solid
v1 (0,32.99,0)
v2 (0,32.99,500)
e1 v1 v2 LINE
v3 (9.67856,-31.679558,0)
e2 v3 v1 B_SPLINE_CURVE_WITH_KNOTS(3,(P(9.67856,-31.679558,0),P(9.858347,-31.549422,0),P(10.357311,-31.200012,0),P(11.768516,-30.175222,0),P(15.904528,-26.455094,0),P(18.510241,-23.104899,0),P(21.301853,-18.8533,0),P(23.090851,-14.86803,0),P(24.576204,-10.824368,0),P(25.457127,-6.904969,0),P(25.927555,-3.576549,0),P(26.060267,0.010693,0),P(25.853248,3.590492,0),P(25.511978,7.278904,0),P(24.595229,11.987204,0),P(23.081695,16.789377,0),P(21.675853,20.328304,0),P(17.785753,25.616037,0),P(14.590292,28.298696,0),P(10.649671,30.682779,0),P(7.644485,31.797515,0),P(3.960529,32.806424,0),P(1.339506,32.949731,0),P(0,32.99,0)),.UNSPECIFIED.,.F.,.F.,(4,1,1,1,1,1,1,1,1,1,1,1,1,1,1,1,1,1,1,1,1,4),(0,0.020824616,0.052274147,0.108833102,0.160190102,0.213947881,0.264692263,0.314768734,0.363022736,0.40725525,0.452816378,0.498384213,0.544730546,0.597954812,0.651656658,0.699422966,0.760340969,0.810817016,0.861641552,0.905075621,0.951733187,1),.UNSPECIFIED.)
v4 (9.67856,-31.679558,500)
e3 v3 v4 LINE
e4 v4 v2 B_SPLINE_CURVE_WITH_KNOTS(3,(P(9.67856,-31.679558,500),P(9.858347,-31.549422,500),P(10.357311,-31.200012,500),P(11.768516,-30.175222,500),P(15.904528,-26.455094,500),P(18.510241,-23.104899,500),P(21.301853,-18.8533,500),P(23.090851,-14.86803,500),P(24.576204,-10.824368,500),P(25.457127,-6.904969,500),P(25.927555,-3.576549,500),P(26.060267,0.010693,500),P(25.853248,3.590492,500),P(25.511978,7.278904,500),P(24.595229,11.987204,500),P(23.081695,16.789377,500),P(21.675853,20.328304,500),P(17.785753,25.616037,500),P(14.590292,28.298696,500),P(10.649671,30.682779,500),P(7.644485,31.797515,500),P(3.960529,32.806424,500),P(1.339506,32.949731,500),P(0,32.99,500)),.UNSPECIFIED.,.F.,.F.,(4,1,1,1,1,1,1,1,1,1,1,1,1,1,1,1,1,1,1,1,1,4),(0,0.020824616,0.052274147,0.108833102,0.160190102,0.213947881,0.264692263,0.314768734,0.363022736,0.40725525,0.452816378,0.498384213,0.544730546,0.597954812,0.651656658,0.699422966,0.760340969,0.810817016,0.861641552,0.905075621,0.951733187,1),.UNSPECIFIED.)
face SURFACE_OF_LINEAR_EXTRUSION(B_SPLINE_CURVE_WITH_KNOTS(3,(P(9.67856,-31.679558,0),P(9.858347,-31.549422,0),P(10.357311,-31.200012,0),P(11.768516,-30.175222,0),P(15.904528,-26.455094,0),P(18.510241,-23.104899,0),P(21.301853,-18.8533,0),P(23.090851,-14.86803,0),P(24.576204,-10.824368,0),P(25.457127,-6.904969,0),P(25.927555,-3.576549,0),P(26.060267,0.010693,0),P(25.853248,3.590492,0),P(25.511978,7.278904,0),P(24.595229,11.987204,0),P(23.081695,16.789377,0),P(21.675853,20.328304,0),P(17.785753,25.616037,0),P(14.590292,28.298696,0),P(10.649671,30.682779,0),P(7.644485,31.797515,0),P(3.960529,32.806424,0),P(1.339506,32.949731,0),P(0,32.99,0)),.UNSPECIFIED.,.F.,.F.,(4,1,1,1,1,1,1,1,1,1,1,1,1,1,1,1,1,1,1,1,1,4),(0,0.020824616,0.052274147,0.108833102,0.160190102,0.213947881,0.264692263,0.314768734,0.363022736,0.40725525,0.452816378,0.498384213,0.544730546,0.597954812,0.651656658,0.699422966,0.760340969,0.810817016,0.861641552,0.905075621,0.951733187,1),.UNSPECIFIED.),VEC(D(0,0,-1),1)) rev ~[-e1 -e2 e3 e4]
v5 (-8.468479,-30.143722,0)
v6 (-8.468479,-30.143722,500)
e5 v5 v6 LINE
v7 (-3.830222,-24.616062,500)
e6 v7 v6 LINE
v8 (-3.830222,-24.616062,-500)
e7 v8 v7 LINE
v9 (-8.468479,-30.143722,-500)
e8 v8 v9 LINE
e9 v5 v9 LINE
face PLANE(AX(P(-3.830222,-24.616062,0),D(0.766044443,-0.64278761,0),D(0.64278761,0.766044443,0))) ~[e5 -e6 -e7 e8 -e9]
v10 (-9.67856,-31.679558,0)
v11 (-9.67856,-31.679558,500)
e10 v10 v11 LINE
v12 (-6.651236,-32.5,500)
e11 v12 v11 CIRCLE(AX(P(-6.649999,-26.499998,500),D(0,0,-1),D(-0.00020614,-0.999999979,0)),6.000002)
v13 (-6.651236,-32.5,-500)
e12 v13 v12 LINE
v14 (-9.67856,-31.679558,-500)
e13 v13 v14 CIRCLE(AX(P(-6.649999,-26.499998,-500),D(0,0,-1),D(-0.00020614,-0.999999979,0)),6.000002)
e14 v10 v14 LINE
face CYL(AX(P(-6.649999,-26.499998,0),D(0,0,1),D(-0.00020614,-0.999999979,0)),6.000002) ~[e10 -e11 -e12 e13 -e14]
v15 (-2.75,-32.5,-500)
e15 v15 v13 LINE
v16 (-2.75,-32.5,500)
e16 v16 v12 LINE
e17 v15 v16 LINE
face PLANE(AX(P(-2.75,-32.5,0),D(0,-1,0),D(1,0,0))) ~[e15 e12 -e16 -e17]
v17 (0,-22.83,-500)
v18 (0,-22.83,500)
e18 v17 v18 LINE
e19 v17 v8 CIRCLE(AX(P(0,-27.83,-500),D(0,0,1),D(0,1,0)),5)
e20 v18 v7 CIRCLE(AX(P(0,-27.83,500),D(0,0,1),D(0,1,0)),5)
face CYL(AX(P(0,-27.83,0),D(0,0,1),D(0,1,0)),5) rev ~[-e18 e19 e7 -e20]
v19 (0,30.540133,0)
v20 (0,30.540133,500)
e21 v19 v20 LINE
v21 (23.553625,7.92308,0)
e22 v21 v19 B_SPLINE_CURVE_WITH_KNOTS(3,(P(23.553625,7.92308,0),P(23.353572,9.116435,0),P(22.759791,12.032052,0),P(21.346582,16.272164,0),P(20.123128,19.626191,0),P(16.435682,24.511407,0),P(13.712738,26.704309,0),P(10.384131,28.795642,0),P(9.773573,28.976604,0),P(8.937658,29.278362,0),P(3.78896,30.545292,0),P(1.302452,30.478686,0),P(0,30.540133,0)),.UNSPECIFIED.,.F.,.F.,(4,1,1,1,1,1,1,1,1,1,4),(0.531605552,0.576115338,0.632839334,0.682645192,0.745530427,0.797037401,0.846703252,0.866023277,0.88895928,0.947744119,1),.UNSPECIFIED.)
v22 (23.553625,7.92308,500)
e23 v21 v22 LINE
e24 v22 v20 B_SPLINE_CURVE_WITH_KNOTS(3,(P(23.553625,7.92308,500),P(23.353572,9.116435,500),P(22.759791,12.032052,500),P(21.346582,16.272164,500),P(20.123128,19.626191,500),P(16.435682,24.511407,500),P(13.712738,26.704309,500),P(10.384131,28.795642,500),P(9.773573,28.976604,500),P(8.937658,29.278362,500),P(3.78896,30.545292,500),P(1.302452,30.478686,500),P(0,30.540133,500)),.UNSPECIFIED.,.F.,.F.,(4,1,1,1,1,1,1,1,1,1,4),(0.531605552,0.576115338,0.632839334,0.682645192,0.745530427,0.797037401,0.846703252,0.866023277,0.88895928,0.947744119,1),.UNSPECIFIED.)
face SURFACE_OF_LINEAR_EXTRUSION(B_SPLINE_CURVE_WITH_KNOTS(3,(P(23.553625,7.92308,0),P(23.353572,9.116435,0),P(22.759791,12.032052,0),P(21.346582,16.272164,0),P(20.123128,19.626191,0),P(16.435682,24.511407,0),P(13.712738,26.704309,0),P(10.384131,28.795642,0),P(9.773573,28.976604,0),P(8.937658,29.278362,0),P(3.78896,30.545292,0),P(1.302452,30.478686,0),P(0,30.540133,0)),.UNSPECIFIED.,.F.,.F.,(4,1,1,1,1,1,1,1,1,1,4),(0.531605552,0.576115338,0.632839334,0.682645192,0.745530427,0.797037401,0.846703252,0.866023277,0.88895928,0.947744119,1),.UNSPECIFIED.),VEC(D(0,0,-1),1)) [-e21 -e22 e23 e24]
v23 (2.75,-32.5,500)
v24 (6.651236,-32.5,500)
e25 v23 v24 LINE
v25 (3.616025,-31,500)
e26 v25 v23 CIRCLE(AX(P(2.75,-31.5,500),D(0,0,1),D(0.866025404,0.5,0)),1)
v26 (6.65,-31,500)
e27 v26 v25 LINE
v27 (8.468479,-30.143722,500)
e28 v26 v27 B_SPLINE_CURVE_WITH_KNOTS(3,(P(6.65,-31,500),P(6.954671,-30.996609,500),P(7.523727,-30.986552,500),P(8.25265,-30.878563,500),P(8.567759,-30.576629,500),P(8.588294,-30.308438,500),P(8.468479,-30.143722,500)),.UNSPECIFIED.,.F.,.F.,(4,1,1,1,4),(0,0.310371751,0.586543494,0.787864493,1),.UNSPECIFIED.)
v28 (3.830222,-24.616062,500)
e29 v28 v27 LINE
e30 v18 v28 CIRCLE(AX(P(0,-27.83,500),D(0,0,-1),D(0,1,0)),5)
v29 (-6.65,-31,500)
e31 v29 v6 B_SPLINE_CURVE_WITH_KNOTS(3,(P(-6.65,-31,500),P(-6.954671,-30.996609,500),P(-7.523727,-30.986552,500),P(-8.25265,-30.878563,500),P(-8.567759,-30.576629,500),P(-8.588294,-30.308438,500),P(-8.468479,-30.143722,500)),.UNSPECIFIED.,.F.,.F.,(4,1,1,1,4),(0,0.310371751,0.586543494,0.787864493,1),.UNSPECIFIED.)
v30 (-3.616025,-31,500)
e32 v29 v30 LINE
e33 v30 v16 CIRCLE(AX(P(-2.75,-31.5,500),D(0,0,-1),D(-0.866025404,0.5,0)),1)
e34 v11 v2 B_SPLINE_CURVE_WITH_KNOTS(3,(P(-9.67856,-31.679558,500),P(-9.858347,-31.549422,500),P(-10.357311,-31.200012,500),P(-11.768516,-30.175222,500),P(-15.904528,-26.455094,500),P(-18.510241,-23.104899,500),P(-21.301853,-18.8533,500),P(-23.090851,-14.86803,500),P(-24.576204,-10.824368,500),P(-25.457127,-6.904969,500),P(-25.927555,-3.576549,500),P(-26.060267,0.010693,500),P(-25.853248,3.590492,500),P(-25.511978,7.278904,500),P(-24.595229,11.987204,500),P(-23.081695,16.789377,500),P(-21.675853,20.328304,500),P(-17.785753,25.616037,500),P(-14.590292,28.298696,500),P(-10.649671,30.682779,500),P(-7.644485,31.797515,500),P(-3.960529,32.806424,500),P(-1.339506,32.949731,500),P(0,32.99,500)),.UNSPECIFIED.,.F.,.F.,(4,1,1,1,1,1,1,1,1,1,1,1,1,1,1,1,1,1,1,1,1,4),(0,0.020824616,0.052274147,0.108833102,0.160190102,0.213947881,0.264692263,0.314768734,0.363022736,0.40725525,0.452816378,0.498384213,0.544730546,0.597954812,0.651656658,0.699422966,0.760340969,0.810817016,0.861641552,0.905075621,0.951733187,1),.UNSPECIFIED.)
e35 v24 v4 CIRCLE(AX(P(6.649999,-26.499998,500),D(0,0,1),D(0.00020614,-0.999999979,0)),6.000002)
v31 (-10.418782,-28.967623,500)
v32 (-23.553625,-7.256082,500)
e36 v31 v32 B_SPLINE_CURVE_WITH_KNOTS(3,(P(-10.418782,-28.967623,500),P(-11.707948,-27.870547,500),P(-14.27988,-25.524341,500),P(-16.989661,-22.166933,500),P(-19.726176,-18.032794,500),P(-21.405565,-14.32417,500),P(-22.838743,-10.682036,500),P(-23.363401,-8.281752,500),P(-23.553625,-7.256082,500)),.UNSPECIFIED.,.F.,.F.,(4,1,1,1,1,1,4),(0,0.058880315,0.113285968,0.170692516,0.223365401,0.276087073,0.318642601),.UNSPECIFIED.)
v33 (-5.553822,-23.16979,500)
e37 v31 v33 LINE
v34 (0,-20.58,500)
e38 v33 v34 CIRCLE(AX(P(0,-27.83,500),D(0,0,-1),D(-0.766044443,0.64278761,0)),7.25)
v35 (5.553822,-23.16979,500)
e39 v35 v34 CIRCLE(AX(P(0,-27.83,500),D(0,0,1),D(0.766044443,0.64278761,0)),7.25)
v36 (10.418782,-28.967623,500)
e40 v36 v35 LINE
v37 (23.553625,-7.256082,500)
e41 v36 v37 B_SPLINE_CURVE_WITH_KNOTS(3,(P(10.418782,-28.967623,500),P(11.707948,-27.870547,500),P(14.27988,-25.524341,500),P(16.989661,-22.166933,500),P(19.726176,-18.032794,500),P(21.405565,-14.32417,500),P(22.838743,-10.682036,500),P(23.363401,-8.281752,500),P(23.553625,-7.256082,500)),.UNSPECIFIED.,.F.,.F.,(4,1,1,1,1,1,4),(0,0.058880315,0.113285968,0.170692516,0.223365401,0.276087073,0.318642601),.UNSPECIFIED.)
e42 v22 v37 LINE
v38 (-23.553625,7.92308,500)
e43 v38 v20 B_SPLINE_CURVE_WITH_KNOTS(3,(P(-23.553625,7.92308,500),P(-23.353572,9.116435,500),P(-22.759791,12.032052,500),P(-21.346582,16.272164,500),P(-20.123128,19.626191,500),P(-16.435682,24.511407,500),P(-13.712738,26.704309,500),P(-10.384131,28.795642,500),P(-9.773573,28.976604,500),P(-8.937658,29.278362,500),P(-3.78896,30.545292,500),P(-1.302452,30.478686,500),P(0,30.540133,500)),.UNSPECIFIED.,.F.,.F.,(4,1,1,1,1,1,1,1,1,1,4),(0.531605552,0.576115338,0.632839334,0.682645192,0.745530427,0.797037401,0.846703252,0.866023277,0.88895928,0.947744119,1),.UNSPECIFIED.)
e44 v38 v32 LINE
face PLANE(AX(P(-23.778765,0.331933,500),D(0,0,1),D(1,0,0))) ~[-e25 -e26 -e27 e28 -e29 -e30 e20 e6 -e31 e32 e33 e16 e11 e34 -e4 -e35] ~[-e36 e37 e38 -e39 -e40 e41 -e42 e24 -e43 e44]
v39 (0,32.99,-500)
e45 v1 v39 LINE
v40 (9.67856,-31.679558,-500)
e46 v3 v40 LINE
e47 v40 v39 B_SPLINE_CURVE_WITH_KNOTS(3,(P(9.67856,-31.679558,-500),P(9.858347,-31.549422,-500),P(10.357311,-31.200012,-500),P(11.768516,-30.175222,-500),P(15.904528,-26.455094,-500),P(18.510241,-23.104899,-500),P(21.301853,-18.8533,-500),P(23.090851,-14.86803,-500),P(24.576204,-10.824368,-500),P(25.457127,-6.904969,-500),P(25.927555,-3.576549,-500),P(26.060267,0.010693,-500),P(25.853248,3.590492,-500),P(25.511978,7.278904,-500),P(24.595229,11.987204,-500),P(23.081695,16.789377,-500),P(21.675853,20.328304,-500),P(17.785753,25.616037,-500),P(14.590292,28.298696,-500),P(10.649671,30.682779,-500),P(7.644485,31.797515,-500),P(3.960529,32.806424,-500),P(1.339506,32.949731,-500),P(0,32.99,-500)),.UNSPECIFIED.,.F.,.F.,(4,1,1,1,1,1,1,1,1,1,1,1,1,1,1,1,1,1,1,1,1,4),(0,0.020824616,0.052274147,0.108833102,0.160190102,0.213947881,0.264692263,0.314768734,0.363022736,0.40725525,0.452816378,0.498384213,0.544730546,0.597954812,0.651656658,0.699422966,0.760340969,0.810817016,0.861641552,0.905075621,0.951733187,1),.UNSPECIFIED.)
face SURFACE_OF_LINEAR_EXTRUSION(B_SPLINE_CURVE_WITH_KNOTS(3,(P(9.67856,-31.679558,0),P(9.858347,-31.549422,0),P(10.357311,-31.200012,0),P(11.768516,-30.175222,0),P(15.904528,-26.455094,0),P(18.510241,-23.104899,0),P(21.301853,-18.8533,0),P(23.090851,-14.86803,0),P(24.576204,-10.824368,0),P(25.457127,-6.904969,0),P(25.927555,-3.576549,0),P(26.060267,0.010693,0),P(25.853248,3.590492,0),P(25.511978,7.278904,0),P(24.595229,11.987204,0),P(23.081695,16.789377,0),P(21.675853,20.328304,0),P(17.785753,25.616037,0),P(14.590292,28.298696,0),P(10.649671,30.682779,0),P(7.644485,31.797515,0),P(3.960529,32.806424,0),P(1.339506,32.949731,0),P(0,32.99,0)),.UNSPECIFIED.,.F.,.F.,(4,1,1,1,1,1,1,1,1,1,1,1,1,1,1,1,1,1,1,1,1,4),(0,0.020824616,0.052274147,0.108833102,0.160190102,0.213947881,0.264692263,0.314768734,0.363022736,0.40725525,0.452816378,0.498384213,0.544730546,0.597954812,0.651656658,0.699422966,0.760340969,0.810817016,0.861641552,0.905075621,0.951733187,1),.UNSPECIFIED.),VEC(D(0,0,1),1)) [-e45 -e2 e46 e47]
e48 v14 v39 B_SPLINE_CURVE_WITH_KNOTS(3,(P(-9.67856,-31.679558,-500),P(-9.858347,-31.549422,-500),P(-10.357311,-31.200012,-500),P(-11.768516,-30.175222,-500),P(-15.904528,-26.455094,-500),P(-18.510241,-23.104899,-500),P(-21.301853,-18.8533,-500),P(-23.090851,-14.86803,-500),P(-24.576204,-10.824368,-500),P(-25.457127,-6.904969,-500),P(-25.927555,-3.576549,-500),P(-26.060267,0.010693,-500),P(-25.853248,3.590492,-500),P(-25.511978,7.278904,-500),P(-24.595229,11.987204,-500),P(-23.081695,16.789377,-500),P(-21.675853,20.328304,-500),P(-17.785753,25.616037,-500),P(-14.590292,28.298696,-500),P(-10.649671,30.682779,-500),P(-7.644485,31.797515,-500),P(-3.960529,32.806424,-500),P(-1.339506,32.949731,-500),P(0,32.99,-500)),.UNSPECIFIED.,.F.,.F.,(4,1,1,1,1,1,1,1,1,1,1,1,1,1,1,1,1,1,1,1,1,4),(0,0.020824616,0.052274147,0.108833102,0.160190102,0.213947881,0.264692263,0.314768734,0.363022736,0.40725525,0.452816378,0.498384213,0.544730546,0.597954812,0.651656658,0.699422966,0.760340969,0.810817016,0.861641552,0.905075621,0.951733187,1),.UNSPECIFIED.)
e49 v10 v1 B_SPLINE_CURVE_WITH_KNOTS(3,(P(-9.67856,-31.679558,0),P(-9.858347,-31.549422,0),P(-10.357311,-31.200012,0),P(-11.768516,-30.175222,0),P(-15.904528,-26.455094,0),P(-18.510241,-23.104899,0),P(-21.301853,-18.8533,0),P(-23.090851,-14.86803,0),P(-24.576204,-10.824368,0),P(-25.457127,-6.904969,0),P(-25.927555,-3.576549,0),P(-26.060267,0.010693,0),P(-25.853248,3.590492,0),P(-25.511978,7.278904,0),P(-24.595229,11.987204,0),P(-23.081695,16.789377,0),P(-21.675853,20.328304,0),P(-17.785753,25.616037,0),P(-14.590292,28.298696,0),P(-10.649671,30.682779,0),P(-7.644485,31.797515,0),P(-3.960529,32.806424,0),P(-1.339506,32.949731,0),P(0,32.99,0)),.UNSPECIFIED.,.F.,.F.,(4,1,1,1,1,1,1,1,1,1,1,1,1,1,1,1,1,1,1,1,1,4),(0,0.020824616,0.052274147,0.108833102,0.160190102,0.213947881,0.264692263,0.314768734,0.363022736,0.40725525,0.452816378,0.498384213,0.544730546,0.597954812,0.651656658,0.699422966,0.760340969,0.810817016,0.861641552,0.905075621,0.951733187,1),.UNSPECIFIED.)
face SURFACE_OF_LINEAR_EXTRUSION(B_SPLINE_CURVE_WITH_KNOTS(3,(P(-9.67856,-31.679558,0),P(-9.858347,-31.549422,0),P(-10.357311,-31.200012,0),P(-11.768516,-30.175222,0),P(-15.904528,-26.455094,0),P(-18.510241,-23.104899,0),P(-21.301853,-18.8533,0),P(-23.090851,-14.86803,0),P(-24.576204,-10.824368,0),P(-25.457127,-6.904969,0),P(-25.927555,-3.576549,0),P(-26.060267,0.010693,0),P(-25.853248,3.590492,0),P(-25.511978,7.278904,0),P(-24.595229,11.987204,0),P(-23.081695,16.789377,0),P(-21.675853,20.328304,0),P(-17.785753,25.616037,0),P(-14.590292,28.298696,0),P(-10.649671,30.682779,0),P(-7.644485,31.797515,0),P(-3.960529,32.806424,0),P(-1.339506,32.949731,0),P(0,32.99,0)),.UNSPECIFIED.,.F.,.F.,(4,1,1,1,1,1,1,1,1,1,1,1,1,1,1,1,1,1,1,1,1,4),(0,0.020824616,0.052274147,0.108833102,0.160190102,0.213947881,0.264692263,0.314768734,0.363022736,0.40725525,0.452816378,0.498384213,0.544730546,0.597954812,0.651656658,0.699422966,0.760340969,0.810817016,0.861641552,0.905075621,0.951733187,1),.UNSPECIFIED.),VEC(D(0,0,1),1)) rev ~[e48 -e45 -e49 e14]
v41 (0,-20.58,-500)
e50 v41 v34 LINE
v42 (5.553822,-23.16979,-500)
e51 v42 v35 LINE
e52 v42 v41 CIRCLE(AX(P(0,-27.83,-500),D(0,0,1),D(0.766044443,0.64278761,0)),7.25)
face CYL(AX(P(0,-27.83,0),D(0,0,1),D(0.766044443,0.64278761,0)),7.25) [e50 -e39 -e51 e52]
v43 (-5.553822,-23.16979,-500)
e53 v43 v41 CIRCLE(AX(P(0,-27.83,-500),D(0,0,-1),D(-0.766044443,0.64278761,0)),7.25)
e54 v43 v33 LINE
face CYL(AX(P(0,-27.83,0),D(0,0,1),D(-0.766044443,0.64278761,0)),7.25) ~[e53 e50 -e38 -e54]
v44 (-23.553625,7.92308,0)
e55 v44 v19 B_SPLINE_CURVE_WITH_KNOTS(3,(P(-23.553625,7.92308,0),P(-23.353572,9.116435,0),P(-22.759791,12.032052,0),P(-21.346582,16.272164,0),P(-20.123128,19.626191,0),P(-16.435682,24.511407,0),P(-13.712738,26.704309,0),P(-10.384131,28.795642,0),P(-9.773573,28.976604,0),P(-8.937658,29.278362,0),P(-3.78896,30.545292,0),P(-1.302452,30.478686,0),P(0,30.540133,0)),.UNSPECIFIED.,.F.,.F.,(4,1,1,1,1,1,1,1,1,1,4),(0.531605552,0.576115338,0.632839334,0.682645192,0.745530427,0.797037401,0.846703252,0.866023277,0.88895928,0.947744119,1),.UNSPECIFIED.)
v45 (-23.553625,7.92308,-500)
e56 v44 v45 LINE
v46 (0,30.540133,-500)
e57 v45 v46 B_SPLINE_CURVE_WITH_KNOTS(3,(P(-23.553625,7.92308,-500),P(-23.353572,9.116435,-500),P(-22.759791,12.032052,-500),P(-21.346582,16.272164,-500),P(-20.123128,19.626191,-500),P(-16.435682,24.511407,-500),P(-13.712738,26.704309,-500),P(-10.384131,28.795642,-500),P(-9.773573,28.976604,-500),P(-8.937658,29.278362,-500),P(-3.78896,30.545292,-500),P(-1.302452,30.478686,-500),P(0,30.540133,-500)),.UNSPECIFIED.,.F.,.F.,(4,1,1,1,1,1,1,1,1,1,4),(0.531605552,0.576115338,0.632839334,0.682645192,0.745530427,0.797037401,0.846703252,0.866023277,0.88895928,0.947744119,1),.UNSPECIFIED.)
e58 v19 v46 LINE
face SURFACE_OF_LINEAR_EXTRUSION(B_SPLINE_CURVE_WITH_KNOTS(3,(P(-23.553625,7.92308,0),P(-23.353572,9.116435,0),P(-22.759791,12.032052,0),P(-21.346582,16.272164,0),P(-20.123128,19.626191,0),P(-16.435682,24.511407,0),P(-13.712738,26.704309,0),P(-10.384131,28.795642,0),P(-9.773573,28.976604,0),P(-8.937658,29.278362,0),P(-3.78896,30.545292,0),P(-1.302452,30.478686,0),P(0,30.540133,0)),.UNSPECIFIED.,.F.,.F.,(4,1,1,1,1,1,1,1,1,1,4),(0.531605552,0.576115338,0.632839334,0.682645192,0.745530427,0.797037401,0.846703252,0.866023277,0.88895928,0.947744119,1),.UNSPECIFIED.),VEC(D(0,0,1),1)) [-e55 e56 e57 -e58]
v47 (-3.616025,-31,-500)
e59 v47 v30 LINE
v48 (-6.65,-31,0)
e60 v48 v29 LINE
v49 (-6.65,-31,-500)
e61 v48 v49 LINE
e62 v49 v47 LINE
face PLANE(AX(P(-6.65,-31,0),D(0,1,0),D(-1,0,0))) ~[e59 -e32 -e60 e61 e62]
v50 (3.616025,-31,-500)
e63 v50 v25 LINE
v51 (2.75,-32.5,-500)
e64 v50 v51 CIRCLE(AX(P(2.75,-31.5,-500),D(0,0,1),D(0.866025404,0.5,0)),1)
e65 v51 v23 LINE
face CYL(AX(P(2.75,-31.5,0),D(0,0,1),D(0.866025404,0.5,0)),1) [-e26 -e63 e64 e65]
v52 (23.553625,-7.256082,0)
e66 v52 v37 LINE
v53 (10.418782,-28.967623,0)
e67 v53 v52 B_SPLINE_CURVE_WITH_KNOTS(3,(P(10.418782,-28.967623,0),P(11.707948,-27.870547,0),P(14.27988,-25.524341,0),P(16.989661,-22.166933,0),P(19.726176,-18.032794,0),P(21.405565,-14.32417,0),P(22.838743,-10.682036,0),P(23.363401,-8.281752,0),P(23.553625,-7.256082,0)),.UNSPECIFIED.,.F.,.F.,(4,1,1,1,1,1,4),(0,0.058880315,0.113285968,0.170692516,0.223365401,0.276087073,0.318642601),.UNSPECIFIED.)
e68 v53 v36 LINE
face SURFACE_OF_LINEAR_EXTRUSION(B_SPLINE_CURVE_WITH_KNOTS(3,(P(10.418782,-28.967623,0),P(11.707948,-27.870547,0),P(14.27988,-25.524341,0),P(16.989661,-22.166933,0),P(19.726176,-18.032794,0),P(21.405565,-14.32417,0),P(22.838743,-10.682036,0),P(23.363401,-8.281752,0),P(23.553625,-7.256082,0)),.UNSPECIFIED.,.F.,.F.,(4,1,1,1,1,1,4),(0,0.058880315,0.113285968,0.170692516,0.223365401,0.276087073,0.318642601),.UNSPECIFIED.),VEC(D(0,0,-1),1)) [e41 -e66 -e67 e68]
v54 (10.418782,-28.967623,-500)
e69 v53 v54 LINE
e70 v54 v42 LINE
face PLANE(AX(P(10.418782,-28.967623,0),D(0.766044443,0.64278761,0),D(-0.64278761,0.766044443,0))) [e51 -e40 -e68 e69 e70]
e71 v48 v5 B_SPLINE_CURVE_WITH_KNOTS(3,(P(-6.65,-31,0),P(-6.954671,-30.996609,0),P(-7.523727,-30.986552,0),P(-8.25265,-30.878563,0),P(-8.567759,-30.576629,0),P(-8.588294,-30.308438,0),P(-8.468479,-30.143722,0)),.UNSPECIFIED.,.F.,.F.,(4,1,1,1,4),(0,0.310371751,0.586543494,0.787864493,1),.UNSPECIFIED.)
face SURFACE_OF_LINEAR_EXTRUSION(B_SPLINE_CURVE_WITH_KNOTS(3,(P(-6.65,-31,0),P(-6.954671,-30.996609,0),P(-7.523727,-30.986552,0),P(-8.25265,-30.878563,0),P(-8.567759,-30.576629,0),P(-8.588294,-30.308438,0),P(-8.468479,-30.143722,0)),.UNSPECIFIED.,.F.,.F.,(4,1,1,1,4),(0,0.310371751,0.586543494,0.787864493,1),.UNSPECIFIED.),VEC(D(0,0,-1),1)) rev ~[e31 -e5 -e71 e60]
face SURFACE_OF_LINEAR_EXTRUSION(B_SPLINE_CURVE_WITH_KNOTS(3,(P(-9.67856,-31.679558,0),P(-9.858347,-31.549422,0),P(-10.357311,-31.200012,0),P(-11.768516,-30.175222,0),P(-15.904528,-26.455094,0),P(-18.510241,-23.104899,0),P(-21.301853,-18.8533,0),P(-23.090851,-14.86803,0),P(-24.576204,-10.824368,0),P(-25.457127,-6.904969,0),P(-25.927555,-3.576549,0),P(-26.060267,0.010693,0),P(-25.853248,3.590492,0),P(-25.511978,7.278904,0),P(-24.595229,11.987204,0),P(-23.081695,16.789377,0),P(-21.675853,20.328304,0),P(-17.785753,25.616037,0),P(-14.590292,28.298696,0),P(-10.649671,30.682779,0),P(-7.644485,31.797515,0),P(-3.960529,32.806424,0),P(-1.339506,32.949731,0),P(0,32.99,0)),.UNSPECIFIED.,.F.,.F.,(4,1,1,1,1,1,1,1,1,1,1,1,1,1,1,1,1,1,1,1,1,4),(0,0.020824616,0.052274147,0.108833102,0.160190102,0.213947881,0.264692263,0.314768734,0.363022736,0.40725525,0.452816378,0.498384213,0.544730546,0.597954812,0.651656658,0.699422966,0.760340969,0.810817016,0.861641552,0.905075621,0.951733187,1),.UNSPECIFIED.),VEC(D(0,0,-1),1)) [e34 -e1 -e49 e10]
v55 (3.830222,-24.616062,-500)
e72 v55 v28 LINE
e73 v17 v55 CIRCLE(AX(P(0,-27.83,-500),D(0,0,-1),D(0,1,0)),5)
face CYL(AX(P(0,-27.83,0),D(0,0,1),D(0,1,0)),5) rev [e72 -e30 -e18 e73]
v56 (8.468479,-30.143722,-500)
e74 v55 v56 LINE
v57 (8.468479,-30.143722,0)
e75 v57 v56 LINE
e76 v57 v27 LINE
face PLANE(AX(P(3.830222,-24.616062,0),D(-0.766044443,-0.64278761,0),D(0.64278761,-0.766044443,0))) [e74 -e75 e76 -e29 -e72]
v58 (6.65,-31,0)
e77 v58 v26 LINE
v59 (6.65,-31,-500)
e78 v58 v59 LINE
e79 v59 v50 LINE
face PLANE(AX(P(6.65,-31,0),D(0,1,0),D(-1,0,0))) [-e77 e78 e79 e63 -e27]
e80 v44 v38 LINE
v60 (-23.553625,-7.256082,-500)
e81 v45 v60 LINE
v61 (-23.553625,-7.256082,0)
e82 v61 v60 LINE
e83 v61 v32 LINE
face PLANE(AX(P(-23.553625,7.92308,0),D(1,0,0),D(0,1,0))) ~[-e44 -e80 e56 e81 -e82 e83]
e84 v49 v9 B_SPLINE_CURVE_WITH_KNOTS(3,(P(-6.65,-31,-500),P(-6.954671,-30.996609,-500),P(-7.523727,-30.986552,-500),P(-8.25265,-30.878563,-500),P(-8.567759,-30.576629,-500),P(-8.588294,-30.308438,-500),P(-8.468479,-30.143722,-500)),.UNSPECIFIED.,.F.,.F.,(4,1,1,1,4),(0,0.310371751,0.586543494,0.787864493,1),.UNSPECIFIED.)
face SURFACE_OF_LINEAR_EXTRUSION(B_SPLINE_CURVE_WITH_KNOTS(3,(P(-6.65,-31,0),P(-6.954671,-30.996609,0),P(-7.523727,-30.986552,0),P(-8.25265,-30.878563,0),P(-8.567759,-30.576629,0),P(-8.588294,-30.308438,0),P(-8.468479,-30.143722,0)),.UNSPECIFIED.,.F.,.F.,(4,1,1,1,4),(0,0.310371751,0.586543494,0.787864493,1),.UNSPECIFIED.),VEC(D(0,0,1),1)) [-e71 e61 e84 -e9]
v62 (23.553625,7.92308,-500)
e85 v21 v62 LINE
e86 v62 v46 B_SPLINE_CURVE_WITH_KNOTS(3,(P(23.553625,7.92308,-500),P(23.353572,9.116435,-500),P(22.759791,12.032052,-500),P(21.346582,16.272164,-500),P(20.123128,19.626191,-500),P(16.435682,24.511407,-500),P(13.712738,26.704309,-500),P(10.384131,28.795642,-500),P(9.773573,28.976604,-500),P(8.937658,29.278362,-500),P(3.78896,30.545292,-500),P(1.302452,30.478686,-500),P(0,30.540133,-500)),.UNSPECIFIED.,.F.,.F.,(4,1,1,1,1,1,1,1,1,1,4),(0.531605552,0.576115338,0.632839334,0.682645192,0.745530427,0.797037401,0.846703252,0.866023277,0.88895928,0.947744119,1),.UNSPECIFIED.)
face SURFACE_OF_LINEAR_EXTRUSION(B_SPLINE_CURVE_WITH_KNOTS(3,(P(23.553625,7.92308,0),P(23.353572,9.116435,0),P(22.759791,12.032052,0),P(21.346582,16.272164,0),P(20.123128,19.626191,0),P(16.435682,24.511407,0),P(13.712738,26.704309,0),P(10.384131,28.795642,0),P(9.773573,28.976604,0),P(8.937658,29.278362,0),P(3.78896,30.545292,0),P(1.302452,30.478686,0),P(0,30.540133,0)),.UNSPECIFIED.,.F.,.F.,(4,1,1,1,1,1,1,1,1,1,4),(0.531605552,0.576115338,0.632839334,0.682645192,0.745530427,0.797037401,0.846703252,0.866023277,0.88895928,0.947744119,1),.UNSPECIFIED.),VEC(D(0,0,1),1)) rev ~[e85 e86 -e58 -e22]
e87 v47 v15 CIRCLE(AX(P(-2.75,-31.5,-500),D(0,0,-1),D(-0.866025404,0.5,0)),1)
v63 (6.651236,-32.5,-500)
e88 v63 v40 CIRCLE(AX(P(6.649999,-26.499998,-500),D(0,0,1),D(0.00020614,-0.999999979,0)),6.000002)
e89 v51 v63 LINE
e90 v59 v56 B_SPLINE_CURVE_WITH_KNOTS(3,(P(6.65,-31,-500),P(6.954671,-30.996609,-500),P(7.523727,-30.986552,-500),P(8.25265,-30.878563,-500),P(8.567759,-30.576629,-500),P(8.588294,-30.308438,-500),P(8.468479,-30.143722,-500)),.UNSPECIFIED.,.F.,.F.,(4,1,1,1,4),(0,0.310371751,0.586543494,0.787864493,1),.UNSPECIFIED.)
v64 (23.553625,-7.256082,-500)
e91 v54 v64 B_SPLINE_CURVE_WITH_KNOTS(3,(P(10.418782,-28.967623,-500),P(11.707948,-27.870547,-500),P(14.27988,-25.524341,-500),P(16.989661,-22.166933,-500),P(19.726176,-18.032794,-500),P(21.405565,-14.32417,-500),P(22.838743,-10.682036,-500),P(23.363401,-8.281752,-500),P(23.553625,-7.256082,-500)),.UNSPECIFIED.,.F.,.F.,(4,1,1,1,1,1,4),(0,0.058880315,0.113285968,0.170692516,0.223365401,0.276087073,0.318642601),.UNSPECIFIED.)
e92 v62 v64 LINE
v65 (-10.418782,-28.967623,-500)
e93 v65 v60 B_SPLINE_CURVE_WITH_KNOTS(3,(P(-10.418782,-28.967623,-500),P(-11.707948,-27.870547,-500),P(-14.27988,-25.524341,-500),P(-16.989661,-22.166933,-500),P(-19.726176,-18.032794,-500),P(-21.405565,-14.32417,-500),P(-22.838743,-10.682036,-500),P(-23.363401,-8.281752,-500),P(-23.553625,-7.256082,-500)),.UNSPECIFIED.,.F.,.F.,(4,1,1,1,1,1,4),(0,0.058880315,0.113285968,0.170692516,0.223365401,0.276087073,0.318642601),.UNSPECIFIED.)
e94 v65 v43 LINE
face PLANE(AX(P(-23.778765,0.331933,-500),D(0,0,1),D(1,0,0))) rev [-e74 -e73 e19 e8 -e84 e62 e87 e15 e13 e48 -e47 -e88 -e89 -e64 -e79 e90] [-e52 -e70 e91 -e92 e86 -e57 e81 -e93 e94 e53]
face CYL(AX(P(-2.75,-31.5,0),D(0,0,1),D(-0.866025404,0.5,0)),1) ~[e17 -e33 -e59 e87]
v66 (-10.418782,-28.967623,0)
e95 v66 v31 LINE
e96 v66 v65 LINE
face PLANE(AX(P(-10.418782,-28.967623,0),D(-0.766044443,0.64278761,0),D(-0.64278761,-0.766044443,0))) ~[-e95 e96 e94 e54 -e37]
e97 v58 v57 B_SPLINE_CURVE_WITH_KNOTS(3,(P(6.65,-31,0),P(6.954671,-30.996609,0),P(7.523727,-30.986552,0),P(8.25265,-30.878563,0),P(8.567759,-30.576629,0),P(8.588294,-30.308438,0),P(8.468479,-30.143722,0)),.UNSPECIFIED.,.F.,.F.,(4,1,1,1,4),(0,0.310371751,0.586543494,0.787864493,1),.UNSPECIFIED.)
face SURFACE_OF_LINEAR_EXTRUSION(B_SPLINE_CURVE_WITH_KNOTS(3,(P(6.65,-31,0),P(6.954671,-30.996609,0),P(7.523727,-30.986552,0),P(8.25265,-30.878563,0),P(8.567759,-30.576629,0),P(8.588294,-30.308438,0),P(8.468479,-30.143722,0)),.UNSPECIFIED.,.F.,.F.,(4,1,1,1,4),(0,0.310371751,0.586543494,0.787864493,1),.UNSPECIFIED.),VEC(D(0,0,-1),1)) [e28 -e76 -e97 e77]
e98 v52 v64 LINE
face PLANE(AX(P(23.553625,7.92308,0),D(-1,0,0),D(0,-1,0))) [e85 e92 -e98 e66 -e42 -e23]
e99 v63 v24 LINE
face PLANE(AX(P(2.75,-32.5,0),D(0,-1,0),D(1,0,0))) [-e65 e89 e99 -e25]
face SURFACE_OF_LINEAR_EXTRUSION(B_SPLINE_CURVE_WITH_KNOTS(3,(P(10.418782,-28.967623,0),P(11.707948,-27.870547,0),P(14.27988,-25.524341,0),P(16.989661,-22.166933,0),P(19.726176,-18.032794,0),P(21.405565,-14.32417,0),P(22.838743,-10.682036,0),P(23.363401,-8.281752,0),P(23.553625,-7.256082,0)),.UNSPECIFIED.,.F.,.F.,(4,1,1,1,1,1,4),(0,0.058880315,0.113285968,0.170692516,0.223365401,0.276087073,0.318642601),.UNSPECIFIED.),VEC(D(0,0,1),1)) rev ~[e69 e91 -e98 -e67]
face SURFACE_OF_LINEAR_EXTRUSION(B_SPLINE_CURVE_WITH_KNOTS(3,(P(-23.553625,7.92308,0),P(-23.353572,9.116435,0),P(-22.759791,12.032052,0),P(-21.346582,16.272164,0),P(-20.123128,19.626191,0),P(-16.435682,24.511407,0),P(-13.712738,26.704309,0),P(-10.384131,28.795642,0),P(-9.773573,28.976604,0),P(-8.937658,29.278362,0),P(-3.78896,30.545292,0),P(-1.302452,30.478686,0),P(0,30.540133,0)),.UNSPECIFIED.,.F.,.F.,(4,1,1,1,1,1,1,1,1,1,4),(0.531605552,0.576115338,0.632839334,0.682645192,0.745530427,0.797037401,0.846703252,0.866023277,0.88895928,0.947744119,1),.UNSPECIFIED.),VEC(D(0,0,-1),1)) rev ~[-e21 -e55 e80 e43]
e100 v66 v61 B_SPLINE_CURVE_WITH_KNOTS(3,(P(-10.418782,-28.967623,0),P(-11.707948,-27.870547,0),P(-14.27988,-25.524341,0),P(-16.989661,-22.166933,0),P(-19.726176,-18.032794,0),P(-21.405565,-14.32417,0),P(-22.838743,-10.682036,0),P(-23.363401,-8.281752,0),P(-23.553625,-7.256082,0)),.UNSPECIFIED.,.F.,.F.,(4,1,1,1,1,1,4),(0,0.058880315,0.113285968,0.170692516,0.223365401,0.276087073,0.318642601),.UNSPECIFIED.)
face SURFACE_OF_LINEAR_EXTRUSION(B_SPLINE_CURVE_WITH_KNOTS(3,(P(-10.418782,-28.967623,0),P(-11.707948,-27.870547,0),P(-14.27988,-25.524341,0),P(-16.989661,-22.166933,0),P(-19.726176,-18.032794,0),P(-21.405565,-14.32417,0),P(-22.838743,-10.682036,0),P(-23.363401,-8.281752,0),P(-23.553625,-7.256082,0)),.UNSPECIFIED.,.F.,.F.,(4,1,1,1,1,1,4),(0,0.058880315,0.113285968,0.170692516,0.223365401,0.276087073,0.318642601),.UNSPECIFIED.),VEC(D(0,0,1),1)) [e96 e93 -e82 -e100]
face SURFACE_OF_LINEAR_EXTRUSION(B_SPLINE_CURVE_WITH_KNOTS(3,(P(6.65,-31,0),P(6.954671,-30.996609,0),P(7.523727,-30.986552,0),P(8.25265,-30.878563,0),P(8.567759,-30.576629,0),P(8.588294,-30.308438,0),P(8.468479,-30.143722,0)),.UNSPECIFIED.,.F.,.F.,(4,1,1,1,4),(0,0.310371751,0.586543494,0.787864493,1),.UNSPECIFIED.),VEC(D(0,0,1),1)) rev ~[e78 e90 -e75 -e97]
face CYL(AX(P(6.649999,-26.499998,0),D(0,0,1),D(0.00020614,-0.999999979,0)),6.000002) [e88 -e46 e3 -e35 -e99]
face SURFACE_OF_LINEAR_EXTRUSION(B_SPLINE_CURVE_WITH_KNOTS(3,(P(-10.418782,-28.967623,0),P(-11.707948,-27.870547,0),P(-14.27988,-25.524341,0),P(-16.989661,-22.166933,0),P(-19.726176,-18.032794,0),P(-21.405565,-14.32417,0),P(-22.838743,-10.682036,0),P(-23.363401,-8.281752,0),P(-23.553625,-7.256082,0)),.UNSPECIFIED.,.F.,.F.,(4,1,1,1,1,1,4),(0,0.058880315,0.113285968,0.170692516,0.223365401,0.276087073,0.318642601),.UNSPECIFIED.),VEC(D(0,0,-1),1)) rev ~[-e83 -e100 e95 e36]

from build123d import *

# Parameters (mm, degrees)
F39_DEPTH = 500


# Not quite as in the source:
# - ends of sketch curves that miss each other by under 0.0002 mm in the source are joined
# - the dataset's text gives a spline's control points without its knots; the knots are read off the source's solid


with BuildPart() as f39:
    # F38 (on Top) → F39 (new body, symmetric)
    with BuildSketch(Plane.XY):
        with BuildLine():
            add(Edge.make_bspline(
                [(23.5536252439, -7.2560820689), (23.5916575277, -7.0510155186), (23.8276840859, -5.7285801466), (24.151531204, -3.4405425007), (24.2873354627, 0.0045356218), (24.1117663849, 3.5050942757), (23.8610925563, 5.9823472927), (23.6100352496, 7.5865837212), (23.5536252439, 7.9230804137)],
                knots=[0.3186426008, 0.3186426008, 0.3186426008, 0.3186426008, 0.3271509051, 0.3740120146, 0.4221074254, 0.470491793, 0.5190548883, 0.5316055523, 0.5316055523, 0.5316055523, 0.5316055523], degree=3))
            Line((23.5536252439, 7.9230804137), (23.5536252439, -7.2560820689))
        make_face()
        with BuildLine():
            add(Edge.make_bspline(
                [(23.5536252439, 7.9230804137), (23.3535723029, 9.1164352465), (22.7597905279, 12.0320516667), (21.3465817892, 16.2721643952), (20.1231279838, 19.6261912332), (16.4356824211, 24.5114069492), (13.7127379229, 26.7043091505), (10.3841309989, 28.7956424718), (9.773572616, 28.9766037477), (8.9376576345, 29.2783622476), (3.7889602927, 30.5452921709), (1.302451708, 30.4786855511), (0, 30.5401328951)],
                knots=[0.5316055523, 0.5316055523, 0.5316055523, 0.5316055523, 0.5761153378, 0.6328393344, 0.682645192, 0.7455304274, 0.7970374007, 0.8467032515, 0.866023277, 0.8889592796, 0.9477441186, 1, 1, 1, 1], degree=3))
            add(Edge.make_bspline(
                [(23.5536252439, -7.2560820689), (23.5916575277, -7.0510155186), (23.8276840859, -5.7285801466), (24.151531204, -3.4405425007), (24.2873354627, 0.0045356218), (24.1117663849, 3.5050942757), (23.8610925563, 5.9823472927), (23.6100352496, 7.5865837212), (23.5536252439, 7.9230804137)],
                knots=[0.3186426008, 0.3186426008, 0.3186426008, 0.3186426008, 0.3271509051, 0.3740120146, 0.4221074254, 0.470491793, 0.5190548883, 0.5316055523, 0.5316055523, 0.5316055523, 0.5316055523], degree=3))
            add(Edge.make_bspline(
                [(10.4187816513, -28.9676227186), (11.7079480537, -27.8705466503), (14.2798804978, -25.524341373), (16.9896606837, -22.1669330847), (19.7261757434, -18.0327940785), (21.4055652093, -14.3241703193), (22.8387426956, -10.682035896), (23.3634012153, -8.2817524061), (23.5536252439, -7.2560820689)],
                knots=[0, 0, 0, 0, 0.058880315, 0.1132859678, 0.1706925161, 0.2233654006, 0.2760870729, 0.3186426008, 0.3186426008, 0.3186426008, 0.3186426008], degree=3))
            Line((10.4187816513, -28.9676227186), (5.5538222126, -23.1697898298))
            ThreePointArc((5.5538222126, -23.1697898298), (3.0639823976, -21.259268544), (0, -20.58))
            Line((0, -20.58), (0, -22.83))
            ThreePointArc((0, -22.83), (2.1130913087, -23.2984610648), (3.8302222156, -24.6160619516))
            Line((3.8302222156, -24.6160619516), (8.4684793359, -30.1437215381))
            add(Edge.make_bspline(
                [(6.65, -31), (6.9546709761, -30.9966091233), (7.5237272259, -30.986551741), (8.2526497082, -30.8785634822), (8.5677592682, -30.5766291439), (8.5882944986, -30.308438465), (8.4684793359, -30.1437215381)],
                knots=[0, 0, 0, 0, 0.3103717511, 0.5865434938, 0.7878644935, 1, 1, 1, 1], degree=3))
            Line((6.65, -31), (3.6160254038, -31))
            ThreePointArc((3.6160254038, -31), (1.8839745962, -31), (2.75, -32.5))
            Line((2.75, -32.5), (6.651236125, -32.5))
            ThreePointArc((6.651236125, -32.5), (8.2194575025, -32.2910968864), (9.6785597859, -31.679558439))
            add(Edge.make_bspline(
                [(9.6785597859, -31.679558439), (9.8583466831, -31.5494218056), (10.3573106888, -31.2000120159), (11.7685158522, -30.1752223914), (15.9045281436, -26.4550937747), (18.5102412317, -23.1048992369), (21.3018526526, -18.8533002992), (23.0908511796, -14.8680295144), (24.5762038864, -10.8243676385), (25.4571270478, -6.9049689645), (25.9275546529, -3.5765491621), (26.0602665892, 0.010692974), (25.8532484214, 3.5904923565), (25.5119778323, 7.2789042864), (24.5952289289, 11.9872035624), (23.0816948011, 16.7893773271), (21.6758529103, 20.3283042369), (17.7857526132, 25.6160368107), (14.5902915982, 28.2986957957), (10.6496706242, 30.6827786965), (7.6444852195, 31.797515139), (3.9605288614, 32.8064243338), (1.3395062246, 32.9497309259), (0, 32.99)],
                knots=[0, 0, 0, 0, 0.0208246159, 0.0522741473, 0.1088331021, 0.1601901023, 0.2139478807, 0.264692263, 0.3147687341, 0.3630227357, 0.40725525, 0.4528163776, 0.4983842129, 0.5447305457, 0.5979548116, 0.6516566578, 0.6994229663, 0.7603409694, 0.8108170161, 0.8616415521, 0.9050756214, 0.9517331874, 1, 1, 1, 1], degree=3))
            Line((0, 32.99), (0, 30.5401328951))
        make_face()
    extrude(amount=F39_DEPTH, both=True)


with BuildPart() as f40_1:
    # F40: instance of F39
    add(f39.part.mirror(Plane.YZ))


with BuildPart() as f39_1:
    add(f39.part)

    # F41: union F40_1
    add(f40_1.part)


solid = f39_1.part
